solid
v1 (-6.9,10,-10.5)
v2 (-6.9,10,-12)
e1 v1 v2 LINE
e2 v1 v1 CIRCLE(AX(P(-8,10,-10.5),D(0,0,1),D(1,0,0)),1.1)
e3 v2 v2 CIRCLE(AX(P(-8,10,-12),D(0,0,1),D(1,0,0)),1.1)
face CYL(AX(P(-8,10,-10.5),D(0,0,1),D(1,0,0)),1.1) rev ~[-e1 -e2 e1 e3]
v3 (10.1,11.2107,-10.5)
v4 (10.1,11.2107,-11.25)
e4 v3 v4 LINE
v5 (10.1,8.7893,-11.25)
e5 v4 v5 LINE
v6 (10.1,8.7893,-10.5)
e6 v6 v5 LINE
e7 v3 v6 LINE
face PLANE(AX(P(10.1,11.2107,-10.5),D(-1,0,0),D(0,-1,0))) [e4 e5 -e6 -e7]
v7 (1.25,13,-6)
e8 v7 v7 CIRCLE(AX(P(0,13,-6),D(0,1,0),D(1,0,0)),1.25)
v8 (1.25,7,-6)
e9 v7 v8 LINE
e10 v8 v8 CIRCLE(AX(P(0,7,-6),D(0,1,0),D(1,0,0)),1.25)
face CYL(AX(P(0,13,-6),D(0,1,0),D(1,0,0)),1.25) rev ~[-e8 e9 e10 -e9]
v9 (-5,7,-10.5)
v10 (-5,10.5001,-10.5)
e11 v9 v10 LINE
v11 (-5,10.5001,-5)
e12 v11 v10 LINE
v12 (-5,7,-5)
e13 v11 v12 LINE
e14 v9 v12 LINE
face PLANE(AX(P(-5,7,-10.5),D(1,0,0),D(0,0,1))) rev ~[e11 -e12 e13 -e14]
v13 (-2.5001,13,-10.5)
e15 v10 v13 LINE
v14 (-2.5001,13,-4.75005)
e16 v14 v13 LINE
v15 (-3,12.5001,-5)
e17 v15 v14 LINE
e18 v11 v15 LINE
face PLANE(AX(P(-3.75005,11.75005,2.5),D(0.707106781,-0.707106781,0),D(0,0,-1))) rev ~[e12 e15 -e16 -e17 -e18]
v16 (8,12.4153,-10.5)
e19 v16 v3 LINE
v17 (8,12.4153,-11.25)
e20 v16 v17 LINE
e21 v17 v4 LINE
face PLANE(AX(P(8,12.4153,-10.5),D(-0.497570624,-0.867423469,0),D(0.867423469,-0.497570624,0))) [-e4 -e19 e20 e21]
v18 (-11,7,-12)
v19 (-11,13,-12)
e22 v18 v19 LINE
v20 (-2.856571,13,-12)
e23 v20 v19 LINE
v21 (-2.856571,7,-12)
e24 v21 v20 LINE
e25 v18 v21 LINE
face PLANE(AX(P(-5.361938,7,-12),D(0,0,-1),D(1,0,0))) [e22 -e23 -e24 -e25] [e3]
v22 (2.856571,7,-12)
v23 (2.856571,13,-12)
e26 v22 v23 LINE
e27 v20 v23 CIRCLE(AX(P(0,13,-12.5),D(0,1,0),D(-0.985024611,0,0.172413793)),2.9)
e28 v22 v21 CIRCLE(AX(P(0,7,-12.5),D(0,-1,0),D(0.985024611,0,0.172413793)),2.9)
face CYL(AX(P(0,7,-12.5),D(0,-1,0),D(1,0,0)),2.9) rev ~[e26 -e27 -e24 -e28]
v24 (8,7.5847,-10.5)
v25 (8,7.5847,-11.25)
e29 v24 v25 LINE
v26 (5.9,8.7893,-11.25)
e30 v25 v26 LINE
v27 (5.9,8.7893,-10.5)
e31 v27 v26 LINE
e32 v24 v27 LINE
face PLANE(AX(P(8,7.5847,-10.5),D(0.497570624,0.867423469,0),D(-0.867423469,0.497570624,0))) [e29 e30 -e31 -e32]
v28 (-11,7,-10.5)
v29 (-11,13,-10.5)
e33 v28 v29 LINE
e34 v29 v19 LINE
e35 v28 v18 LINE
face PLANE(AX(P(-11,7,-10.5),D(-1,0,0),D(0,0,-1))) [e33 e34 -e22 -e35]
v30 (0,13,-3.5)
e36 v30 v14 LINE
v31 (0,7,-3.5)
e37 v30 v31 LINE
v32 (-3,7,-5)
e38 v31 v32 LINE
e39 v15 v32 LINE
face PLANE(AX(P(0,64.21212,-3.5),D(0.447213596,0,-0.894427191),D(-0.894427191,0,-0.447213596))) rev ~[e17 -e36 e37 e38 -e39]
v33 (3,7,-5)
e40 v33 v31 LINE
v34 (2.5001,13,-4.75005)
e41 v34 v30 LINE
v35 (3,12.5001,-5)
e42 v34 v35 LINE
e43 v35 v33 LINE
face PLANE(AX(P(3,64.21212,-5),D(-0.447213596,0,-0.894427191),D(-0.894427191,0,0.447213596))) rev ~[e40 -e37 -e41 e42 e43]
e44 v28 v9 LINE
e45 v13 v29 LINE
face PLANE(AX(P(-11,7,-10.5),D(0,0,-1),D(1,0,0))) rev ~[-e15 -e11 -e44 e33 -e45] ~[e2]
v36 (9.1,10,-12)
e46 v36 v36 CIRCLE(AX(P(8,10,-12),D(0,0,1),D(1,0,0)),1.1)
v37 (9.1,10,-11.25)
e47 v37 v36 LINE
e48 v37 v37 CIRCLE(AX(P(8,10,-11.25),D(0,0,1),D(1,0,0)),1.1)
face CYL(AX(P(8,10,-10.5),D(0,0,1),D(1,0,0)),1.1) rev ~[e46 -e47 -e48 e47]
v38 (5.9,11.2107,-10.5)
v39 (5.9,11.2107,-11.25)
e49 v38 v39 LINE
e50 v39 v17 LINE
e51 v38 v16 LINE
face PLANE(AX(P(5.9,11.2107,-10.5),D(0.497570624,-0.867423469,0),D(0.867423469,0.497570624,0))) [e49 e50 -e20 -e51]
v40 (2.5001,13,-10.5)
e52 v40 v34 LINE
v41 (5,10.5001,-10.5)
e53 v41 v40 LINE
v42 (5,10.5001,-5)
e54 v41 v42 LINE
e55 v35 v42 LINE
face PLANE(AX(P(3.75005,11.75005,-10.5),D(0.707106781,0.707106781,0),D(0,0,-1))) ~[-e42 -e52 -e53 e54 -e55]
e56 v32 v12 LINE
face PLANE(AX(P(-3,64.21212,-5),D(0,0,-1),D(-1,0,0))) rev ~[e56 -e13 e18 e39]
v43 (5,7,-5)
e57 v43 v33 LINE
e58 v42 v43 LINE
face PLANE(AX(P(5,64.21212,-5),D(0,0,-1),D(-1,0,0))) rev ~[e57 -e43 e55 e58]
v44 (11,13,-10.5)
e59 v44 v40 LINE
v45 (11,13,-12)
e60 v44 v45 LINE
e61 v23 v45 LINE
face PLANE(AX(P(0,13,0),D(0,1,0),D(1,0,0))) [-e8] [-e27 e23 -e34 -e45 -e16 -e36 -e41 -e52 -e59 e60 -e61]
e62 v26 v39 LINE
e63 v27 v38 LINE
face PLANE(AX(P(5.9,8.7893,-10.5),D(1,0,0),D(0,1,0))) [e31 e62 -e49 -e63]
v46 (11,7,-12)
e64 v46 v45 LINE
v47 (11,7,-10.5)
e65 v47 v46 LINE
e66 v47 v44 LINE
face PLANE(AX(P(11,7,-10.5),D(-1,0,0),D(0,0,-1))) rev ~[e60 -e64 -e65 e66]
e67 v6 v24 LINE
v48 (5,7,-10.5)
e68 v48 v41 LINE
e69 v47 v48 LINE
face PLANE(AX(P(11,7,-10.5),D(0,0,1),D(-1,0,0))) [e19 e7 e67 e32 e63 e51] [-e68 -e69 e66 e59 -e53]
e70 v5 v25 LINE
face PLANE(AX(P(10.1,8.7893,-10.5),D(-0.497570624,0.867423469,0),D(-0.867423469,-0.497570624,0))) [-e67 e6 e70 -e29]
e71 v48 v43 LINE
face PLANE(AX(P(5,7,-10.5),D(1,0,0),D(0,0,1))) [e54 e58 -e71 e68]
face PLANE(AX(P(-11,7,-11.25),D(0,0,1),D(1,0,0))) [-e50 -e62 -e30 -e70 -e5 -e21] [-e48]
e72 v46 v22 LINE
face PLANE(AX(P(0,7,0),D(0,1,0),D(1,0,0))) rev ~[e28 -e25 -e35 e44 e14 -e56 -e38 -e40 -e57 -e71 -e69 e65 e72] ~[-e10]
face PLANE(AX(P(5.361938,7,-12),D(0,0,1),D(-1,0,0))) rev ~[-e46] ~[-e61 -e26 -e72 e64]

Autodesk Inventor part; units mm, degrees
ref_plane "YZ Plane" through (0, 0, 0) normal (1, 0, 0) x (0, 1, 0)
ref_plane "XZ Plane" through (0, 0, 0) normal (0, 1, 0) x (-1, 0, 0)
ref_plane "XY Plane" through (0, 0, 0) normal (0, 0, 1) x (1, 0, 0)
sketch "スケッチ1" plane through (0, 0, 0) normal (0, 1, 0) x (-1, 0, 0)
  line L0 (15, 2.5) -> (-15, 2.5)
  line L1 (-15, 2.5) -> (-15, -2.5)
  line L2 (-15, -2.5) -> (15, -2.5)
  line L3 (15, -2.5) -> (15, 2.5)
  line L4 (15, 2.5) -> (-15, -2.5) construction
  line L5 (-15, 2.5) -> (15, -2.5) construction
  point P0 (0, 0)
  dimension "d0" = 30
  dimension "d1" = 5
extrude "押し出し1" add sketch "スケッチ1" along normal blind 7
sketch "スケッチ2" plane through (0, 7, 0) normal (0, 1, 0) x (1, 0, 0)
  circle A0 centre (0, 12.5) radius 2.9
  circle A1 centre (0, 12.5) radius 5.3852
  line L0 (-11, 10.5) -> (-5, 10.5)
  line L1 (-5, 10.5) -> (-5, 2.5)
  line L2 (15, 2.5) -> (-15, 2.5) projected
  line L3 (0, -8.1348) -> (0, 42.7212)
  line L4 (-15, -2.5) -> (15, -2.5) projected
  line L5 (15, -2.5) -> (15, 2.5) projected
  line L6 (15, 2.5) -> (-15, 2.5) projected
  line L7 (-15, 2.5) -> (-15, -2.5) projected
  line L8 (-15, -2.5) -> (15, -2.5) projected
  line L9 (-11, 10.5) -> (-11, 12)
  line L10 (-11, 12) -> (0, 12)
  line L11 (11, 10.5) -> (5, 10.5)
  line L12 (5, 10.5) -> (5, 2.5)
  line L13 (11, 10.5) -> (11, 12)
  line L14 (11, 12) -> (0, 12)
  point P0 (0, 0)
  point P1 (2.8566, 12)
  point P2 (-2.8566, 12)
  dimension "d5" = 5.8
  dimension "d9" = 6
  dimension "d10" = 10
  dimension "d40" = 0.5
  dimension "d41" = 15
  dimension "d42" = 1.5
extrude "押し出し2" add sketch "スケッチ2" along normal blind 6 contours L14 A1 L3 A0 | A0 L3 A1 L10 | L14 L13 L11 A1 | A1 L0 L9 L10 | L3 L2 L1 A1 | A1 L12 L2 L3 | L3 L4 L7 L2 | L2 L5 L4 L3 picked at (0.6464, 8.0199) picked at (-0.6464, 8.0199)
sketch "スケッチ4" plane through (0, 0, 0) normal (0, -1, 0) x (1, 0, 0)
  line L0 (-15, 2.5) -> (15, 2.5) projected
  line L1 (-15, -2.5) -> (-15, 2.5) projected
  line L2 (-15, 2.5) -> (15, 2.5) projected
  circle A0 centre (-12.5, 0) radius 1.6
  line L3 (0, 2.5) -> (0, -2.5)
  circle A1 centre (12.5, 0) radius 1.6
  point P0 (0, 0)
  point P1 (-15, 0)
  dimension "d78" = 3.2
  dimension "d79" = 2.5
extrude "押し出し4" cut sketch "スケッチ4" against normal blind 5
sketch "スケッチ5" plane through (-11, 7, -10.5) normal (0, 0, 1) x (1, 0, 0)
  circle A0 centre (3, 3) radius 1.1
  circle A1 centre (19, 3) radius 1.1
  line L0 (0, 6) -> (6, 6) projected
  line L1 (0, 0) -> (0, 6) projected
  line L2 (19, 5.3) -> (17, 4.1528)
  line L3 (17, 4.1528) -> (17, 1.8472)
  line L4 (17, 1.8472) -> (19, 0.7)
  line L5 (19, 0.7) -> (21, 1.8472)
  line L6 (21, 1.8472) -> (21, 4.1528)
  line L7 (21, 4.1528) -> (19, 5.3)
  line L8 (17, 1.8472) -> (21, 4.1528)
  line L9 (17, 4.1528) -> (21, 1.8472)
  line L10 (19, 5.3) -> (19, 0.7)
  line L11 (16.9, 4.2107) -> (19, 5.4153)
  line L12 (19, 5.4153) -> (21.1, 4.2107)
  line L13 (21.1, 4.2107) -> (21.1, 1.7893)
  line L14 (21.1, 1.7893) -> (19, 0.5847)
  line L15 (19, 0.5847) -> (16.9, 1.7893)
  line L16 (16.9, 1.7893) -> (16.9, 4.2107)
  line L17 (16, 6) -> (22, 6) projected
  line L18 (22, 0) -> (22, 6) projected
  point P0 (11, -7)
  point P1 (3, 6)
  point P2 (0, 3)
  point P3 (19, 6)
  point P4 (22, 3)
  dimension "d0" = 30
  dimension "d1" = 5
  dimension "d27" = 2.2
  dimension "d28" = 2.2
  dimension "d29" = 4.6
  dimension "d31" = 4
  dimension "d35" = 0.1
extrude "押し出し5" cut sketch "スケッチ5" against normal blind 0.75 contours A1 L9 L8 | A1 L8 L6 L9 | L8 L10 A1 | A1 L10 L7 L8 | L9 L5 L10 A1 | A1 L10 L9 | L10 L9 A1 | A1 L9 L2 L10 | L10 A1 L8 | L8 A1 L9 | L10 L4 L8 A1 | A1 L8 L3 L9 | L11 L12 L13 L14 L15 L16
extrude "押し出し6" cut sketch "スケッチ5" against normal through all contours A0
extrude "押し出し7" cut sketch "スケッチ5" against normal through all contours A1 L9 L8 | L8 L10 A1 | A1 L10 L9 | L10 L9 A1 | L10 A1 L8 | L8 A1 L9
sketch "スケッチ7" plane through (15, 0, -2.5) normal (0, 0, -1) x (-1, 0, 0)
  line L0 (10, 7.5) -> (0, 7.5)
  line L1 (0, 0) -> (0, 13) projected
  line L2 (10, 13) -> (10, 7.5)
  circle A0 centre (7, 10) radius 1.1 projected
  line L3 (4, 7) -> (12.1434, 7) projected
  line L4 (12.1434, 7) -> (12.1434, 13) projected
  line L5 (4, 13) -> (12.1434, 13) projected
  line L6 (4, 7) -> (4, 13) projected
  line L7 (0, 0) -> (30, 0) projected
  line L8 (30, 0) -> (30, 13) projected
  line L9 (20, 13) -> (30, 13) projected
  line L10 (20, 7) -> (20, 13) projected
  line L11 (10, 7) -> (20, 7) projected
  line L12 (10, 7) -> (10, 13) projected
  line L13 (0, 13) -> (10, 13) projected
  line L14 (0, 0) -> (0, 13) projected
  line L15 (15, 13) -> (15, 0)
  line L16 (20, 7.5) -> (30, 7.5)
  line L17 (20, 13) -> (20, 7.5)
  dimension "d53" = 0.5
extrude "押し出し8" cut sketch "スケッチ7" against normal through all contours L0 L6 L5 L2 | L0 L1 L13 L6 | L10 L9 L8 L16 | A0
chamfer "面取り6" distance 3 angle 45 2 edges at (5, 7.5, 0) (-5, 7.5, 0)
chamfer "面取り7" distance 2 angle 45 2 edges at (15, 7.5, 0) (-15, 7.5, 0)
chamfer "面取り8" distance 2.5 angle 45 2 edges at (5, 13, -4) (-5, 13, -4)
chamfer "面取り9" distance 2 angle 45 11 edges at (-10.5, 7.5, 2.5) (-6.5, 9, 2.5) (0, 13, 2.5) (6.5, 9, 2.5) (10.5, 7.5, 2.5) (-14, 6.5, -2.5) (-10.5, 7.5, -2.5) (-6.5, 9, -2.5) (6.5, 9, -2.5) (10.5, 7.5, -2.5) (14, 6.5, -2.5)
sketch "スケッチ9" plane through (0, 13, 0) normal (0, 1, 0) x (1, 0, 0)
  circle A0 centre (0, 6) radius 1.25
  point P0 (0, 0)
  dimension "d74" = 2.5
  dimension "d75" = 6
extrude "押し出し9" cut sketch "スケッチ9" against normal through all
sketch "スケッチ10" plane through (0, 7, 0) normal (0, -1, 0) x (1, 0, 0)
  line L0 (5, -2.5) -> (5, -10.5) projected
  line L1 (5, -5) -> (3, -5)
  line L2 (3, -5) -> (0, -3.5)
  line L3 (0, -3.5) -> (-3, -5)
  line L4 (-3, -5) -> (-5, -5)
  line L5 (15, -2.5) -> (-15, -2.5) projected
  line L6 (-5, -10.5) -> (-5, -2.5) projected
  point P0 (0, 0)
  dimension "d80" = 2.5
  dimension "d81" = 1.5
  dimension "d82" = 2
split body "分割2" sketch "スケッチ10" result one side removed curves L1 L2 L3 L4 removed pieces at (2.3905, 1.8333, 2)
properties part number "mounter_top"
